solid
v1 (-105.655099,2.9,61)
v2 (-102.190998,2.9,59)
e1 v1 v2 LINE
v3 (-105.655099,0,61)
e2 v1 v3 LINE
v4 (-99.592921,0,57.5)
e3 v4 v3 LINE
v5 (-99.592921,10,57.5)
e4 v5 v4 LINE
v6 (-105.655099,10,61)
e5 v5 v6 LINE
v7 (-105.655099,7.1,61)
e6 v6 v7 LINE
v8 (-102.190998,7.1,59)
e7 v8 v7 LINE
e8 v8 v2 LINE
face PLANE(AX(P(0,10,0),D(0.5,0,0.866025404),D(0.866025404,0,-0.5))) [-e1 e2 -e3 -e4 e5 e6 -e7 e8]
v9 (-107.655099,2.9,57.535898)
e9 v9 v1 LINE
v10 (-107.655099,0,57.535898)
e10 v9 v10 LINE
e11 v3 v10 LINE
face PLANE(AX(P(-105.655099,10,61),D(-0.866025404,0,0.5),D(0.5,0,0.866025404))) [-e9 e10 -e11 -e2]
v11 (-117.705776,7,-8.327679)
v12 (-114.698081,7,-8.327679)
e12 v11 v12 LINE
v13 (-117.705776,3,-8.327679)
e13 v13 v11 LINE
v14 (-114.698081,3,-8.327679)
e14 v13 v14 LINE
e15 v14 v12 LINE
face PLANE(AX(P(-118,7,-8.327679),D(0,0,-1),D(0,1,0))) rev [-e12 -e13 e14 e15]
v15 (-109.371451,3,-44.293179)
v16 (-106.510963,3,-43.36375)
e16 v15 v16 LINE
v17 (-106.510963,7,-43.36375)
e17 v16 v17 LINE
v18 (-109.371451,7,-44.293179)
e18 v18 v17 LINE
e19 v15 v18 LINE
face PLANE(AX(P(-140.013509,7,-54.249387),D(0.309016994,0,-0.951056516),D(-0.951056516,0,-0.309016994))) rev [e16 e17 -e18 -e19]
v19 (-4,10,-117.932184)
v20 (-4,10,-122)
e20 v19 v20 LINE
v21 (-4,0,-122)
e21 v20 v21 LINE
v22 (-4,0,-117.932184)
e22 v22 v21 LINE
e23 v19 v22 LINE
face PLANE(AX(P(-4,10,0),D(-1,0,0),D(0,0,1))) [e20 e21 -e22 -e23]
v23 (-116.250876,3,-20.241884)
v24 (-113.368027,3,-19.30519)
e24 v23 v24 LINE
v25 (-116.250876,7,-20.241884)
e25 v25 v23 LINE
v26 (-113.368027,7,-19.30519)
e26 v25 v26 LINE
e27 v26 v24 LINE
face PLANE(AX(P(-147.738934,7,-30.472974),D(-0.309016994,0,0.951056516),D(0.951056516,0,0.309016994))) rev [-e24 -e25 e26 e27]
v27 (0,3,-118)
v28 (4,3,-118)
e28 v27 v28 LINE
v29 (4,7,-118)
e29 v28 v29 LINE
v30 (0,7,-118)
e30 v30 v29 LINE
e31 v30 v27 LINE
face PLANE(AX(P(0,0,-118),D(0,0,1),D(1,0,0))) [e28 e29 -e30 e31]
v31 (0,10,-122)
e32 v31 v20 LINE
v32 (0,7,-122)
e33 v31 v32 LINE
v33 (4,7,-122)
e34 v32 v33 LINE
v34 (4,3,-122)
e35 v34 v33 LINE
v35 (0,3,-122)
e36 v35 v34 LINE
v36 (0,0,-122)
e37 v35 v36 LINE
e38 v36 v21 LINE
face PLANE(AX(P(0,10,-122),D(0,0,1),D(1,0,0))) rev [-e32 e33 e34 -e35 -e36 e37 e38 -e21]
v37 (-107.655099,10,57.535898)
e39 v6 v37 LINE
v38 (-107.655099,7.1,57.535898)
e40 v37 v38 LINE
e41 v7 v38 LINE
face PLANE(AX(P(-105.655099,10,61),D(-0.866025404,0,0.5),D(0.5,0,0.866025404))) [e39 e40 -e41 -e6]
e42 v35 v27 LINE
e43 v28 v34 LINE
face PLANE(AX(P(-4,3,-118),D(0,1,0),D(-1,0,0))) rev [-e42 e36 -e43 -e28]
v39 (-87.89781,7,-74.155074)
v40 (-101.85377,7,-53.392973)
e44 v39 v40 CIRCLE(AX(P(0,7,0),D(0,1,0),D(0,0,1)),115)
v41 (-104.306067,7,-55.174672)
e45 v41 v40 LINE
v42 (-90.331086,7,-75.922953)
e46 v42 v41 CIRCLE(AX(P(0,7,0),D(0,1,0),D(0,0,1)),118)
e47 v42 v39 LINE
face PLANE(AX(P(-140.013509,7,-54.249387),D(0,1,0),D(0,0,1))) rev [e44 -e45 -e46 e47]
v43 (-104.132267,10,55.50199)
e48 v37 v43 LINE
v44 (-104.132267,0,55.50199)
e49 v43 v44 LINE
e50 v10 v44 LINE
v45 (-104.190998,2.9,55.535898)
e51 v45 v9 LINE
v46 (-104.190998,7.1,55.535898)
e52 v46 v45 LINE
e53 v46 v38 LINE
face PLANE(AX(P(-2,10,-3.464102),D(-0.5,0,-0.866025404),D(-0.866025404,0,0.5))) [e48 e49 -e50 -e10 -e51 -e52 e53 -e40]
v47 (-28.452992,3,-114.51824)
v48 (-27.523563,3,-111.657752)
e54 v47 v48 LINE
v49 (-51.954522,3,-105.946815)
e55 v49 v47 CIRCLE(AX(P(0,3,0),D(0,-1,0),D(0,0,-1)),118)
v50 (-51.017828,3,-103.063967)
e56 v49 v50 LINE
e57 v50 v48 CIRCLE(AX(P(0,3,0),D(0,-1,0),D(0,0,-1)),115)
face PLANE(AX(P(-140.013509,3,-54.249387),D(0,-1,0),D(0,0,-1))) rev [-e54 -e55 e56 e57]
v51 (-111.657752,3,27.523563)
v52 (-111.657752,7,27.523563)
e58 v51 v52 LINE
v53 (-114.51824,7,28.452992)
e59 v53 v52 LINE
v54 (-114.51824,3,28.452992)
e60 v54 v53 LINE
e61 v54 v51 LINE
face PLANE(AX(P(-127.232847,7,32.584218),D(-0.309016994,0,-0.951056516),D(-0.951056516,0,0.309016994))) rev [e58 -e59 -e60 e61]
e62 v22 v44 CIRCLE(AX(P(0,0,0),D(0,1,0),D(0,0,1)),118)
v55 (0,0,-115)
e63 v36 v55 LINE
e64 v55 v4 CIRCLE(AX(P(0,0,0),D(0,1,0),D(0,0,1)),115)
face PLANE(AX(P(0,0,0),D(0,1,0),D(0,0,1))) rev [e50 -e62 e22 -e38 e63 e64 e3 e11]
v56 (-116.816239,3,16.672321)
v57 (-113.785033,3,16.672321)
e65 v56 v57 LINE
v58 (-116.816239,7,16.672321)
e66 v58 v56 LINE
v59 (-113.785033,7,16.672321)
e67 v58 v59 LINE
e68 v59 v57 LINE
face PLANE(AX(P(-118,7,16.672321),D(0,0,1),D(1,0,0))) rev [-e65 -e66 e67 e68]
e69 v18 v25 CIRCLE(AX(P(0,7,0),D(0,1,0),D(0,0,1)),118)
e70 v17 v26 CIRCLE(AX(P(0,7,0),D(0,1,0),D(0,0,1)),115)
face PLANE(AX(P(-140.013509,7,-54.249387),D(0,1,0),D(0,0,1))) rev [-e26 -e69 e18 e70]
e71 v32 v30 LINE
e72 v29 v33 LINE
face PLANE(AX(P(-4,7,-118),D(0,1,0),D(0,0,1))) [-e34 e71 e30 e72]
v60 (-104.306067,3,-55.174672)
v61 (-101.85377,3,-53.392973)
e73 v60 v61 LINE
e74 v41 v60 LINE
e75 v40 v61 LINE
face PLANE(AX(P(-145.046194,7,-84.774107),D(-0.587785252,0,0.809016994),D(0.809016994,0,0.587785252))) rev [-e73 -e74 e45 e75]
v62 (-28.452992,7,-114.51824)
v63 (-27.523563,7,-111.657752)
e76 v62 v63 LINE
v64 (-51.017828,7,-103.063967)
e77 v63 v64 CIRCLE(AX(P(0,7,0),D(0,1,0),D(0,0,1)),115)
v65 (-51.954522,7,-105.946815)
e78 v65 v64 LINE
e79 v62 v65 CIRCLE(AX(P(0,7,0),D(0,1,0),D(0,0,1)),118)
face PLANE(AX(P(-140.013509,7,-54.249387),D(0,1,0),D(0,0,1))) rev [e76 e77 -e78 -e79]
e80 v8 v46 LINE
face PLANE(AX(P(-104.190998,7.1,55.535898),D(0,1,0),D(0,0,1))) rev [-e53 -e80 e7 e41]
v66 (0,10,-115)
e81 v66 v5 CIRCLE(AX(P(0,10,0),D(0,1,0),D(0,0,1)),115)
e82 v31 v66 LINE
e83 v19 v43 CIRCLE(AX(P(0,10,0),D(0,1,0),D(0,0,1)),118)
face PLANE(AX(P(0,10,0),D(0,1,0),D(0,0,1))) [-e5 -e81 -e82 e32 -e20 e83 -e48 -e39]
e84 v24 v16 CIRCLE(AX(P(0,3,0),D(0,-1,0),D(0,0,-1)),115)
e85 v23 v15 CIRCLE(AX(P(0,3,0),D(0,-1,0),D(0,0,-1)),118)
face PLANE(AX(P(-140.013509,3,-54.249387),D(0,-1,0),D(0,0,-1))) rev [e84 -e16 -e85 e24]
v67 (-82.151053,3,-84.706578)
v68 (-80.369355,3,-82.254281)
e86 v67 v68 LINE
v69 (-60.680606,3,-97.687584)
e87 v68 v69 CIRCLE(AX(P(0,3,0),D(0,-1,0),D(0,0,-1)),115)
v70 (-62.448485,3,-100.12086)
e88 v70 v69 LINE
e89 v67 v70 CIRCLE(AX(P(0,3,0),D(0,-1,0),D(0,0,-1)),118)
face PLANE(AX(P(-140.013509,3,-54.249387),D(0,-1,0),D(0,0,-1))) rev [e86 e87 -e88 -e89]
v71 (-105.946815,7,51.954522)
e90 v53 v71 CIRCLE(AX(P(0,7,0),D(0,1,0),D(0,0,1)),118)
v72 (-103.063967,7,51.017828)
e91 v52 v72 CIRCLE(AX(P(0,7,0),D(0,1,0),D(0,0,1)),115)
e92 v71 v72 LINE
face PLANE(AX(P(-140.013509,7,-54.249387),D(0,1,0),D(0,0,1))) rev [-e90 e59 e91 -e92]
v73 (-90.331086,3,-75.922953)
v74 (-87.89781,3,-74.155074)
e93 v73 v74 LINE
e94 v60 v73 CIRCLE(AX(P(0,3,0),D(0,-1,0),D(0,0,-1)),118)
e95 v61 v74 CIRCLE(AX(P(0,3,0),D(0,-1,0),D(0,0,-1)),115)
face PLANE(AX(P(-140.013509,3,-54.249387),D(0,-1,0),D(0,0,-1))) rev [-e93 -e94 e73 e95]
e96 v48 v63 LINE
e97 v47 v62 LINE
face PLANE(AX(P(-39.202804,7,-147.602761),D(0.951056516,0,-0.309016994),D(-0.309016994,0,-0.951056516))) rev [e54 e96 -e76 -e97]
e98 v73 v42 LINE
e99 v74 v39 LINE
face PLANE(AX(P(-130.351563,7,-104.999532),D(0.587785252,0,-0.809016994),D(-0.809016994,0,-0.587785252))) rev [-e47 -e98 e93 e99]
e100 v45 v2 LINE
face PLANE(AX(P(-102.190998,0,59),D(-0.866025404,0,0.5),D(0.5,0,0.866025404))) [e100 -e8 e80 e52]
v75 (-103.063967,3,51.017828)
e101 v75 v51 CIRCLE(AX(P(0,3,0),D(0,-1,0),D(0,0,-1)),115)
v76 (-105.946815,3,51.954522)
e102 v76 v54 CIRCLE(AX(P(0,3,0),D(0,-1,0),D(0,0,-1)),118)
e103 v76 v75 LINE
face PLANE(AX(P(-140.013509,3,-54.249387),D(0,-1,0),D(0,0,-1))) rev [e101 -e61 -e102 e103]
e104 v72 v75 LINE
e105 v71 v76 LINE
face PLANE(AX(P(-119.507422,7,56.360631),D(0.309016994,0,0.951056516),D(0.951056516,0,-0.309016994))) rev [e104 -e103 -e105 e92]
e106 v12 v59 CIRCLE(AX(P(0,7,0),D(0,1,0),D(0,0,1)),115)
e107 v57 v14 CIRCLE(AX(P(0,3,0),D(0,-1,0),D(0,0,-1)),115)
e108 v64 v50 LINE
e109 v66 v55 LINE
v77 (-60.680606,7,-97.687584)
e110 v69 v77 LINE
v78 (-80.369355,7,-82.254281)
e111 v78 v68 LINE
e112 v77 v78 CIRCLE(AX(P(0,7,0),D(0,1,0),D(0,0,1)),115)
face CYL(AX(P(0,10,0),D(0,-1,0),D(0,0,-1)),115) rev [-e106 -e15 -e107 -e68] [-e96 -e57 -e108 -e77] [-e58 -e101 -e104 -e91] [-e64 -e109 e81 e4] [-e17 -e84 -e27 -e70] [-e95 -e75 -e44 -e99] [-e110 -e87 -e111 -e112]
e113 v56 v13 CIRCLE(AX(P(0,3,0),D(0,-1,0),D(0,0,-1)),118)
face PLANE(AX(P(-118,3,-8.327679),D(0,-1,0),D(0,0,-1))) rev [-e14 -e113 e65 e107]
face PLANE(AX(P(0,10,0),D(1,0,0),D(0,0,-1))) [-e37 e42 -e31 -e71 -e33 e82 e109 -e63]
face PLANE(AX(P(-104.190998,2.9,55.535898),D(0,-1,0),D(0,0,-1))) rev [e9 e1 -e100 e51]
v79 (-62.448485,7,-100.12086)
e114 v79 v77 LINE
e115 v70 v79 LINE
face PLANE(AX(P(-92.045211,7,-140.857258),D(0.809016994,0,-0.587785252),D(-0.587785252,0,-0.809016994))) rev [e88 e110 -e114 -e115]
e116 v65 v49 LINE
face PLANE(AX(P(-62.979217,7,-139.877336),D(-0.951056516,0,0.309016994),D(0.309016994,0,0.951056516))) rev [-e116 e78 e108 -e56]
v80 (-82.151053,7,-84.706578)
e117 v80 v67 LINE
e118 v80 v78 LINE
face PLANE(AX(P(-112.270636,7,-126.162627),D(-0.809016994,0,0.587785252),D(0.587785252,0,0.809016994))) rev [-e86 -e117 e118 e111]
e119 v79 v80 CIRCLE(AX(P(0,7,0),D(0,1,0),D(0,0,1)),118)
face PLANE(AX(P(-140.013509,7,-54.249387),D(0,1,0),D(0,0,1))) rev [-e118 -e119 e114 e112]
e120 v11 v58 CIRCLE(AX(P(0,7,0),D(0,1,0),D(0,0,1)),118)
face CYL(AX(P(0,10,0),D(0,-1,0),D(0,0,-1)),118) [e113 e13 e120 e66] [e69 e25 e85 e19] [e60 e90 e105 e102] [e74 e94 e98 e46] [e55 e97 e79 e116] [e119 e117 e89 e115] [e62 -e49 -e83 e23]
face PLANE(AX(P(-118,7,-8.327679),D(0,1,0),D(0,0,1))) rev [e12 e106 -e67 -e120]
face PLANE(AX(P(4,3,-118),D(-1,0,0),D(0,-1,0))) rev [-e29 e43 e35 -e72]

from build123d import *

# Parameters (mm, degrees)
BOSS_EXTRUDE1_DEPTH     = 10
SKETCH2_W               = 8
SKETCH2_H               = 4.2
CUT_EXTRUDE1_DEPTH      = 4
CIRPATTERN4_START       = 3
CIRPATTERN4_DEPTH       = 4
CIRPATTERN4_2_OUTLINE_W = 4
CIRPATTERN4_2_OUTLINE_H = 4
CIRPATTERN4_2_DEPTH     = 4


# Read off the part's stored shape, not the designer's step: CirPattern4
with BuildPart() as part:
    # Sketch1 → Boss-Extrude1 (new body)
    with BuildSketch(Plane(origin=(0, 0, 0), x_dir=(1, 0, 0), z_dir=(0, 1, 0))):
        with BuildLine():
            Line((-4, 122), (-4, 117.932183902))
            ThreePointArc((-4, 117.932183902), (-102.190997647, 59), (-104.132267183, -55.501990336))
            Line((-104.132267183, -55.501990336), (-107.655099262, -57.535898385))
            Line((-107.655099262, -57.535898385), (-105.655099262, -61))
            Line((-105.655099262, -61), (-99.592921435, -57.5))
            ThreePointArc((-99.592921435, -57.5), (-99.592921435, 57.5), (0, 115))
            Line((0, 115), (0, 122))
            Line((0, 122), (-4, 122))
        make_face()
    extrude(amount=BOSS_EXTRUDE1_DEPTH)

    # Sketch2 → Cut-Extrude1 (cut)
    with BuildSketch(Plane(origin=(-105.655099262, 0, 61), x_dir=(0.4999999999999976, 0, 0.86602540378444), z_dir=(-0.8660254037844402, 0, 0.4999999999999977))):
        with Locations((0, 5)):
            Rectangle(SKETCH2_W, SKETCH2_H)
    extrude(amount=-CUT_EXTRUDE1_DEPTH, mode=Mode.SUBTRACT)

    # CirPattern4 outline → CirPattern4 (cut)
    with BuildSketch(Plane(origin=(0, 0, 0), x_dir=(1, 0, 0), z_dir=(0, 1, 0)).offset(CIRPATTERN4_START)):
        with BuildLine():
            ThreePointArc((-51.017828253, 103.063966547), (-39.505073194, 108.001616617), (-27.523562684, 111.657751622))
            Line((-27.523562684, 111.657751622), (-28.45299166, 114.518239882))
            ThreePointArc((-28.45299166, 114.518239882), (-40.431539839, 110.857072784), (-51.954522475, 105.946814933))
            Line((-51.954522475, 105.946814933), (-51.017828253, 103.063966547))
        make_face()
        with BuildLine():
            ThreePointArc((-80.369355178, 82.254281033), (-70.945892242, 90.507902273), (-60.680606447, 97.68758366))
            Line((-60.680606447, 97.68758366), (-62.448485416, 100.12086031))
            ThreePointArc((-62.448485416, 100.12086031), (-72.709398865, 92.93730853), (-82.151053465, 84.706578343))
            Line((-82.151053465, 84.706578343), (-80.369355178, 82.254281033))
        make_face()
        with BuildLine():
            ThreePointArc((-101.853769652, 53.392973393), (-95.442033049, 64.154643849), (-87.897809664, 74.15507438))
            Line((-87.897809664, 74.15507438), (-90.331086315, 75.922953349))
            ThreePointArc((-90.331086315, 75.922953349), (-97.869955334, 65.920192984), (-104.306066962, 55.17467168))
            Line((-104.306066962, 55.17467168), (-101.853769652, 53.392973393))
        make_face()
        with BuildLine():
            ThreePointArc((-113.368027495, 19.305189506), (-110.595642677, 31.521481894), (-106.510962851, 43.363749751))
            Line((-106.510962851, 43.363749751), (-109.371451112, 44.293178727))
            ThreePointArc((-109.371451112, 44.293178727), (-113.450318674, 32.450349656), (-116.250875881, 20.241883728))
            Line((-116.250875881, 20.241883728), (-113.368027495, 19.305189506))
        make_face()
        with BuildLine():
            ThreePointArc((-113.785032926, -16.672320837), (-114.923380235, -4.197222333), (-114.698080889, 8.327679163))
            Line((-114.698080889, 8.327679163), (-117.705776238, 8.327679163))
            ThreePointArc((-117.705776238, 8.327679163), (-117.925374368, -4.195959991), (-116.816239102, -16.672320837))
            Line((-116.816239102, -16.672320837), (-113.785032926, -16.672320837))
        make_face()
        with BuildLine():
            ThreePointArc((-103.063966547, -51.017828253), (-108.001616617, -39.505073194), (-111.657751621, -27.523562684))
            Line((-111.657751621, -27.523562684), (-114.518239882, -28.45299166))
            ThreePointArc((-114.518239882, -28.45299166), (-110.857072784, -40.431539839), (-105.946814933, -51.954522475))
            Line((-105.946814933, -51.954522475), (-103.063966547, -51.017828253))
        make_face()
    extrude(amount=CIRPATTERN4_DEPTH, mode=Mode.SUBTRACT)

    # CirPattern4 2 outline → CirPattern4 2 (add)
    with BuildSketch(Plane(origin=(0, 0, 0), x_dir=(1, 0, 0), z_dir=(0, 1, 0)).offset(CIRPATTERN4_START)):
        with Locations((2, 120)):
            Rectangle(CIRPATTERN4_2_OUTLINE_W, CIRPATTERN4_2_OUTLINE_H)
    extrude(amount=CIRPATTERN4_2_DEPTH)


solid = part.part
